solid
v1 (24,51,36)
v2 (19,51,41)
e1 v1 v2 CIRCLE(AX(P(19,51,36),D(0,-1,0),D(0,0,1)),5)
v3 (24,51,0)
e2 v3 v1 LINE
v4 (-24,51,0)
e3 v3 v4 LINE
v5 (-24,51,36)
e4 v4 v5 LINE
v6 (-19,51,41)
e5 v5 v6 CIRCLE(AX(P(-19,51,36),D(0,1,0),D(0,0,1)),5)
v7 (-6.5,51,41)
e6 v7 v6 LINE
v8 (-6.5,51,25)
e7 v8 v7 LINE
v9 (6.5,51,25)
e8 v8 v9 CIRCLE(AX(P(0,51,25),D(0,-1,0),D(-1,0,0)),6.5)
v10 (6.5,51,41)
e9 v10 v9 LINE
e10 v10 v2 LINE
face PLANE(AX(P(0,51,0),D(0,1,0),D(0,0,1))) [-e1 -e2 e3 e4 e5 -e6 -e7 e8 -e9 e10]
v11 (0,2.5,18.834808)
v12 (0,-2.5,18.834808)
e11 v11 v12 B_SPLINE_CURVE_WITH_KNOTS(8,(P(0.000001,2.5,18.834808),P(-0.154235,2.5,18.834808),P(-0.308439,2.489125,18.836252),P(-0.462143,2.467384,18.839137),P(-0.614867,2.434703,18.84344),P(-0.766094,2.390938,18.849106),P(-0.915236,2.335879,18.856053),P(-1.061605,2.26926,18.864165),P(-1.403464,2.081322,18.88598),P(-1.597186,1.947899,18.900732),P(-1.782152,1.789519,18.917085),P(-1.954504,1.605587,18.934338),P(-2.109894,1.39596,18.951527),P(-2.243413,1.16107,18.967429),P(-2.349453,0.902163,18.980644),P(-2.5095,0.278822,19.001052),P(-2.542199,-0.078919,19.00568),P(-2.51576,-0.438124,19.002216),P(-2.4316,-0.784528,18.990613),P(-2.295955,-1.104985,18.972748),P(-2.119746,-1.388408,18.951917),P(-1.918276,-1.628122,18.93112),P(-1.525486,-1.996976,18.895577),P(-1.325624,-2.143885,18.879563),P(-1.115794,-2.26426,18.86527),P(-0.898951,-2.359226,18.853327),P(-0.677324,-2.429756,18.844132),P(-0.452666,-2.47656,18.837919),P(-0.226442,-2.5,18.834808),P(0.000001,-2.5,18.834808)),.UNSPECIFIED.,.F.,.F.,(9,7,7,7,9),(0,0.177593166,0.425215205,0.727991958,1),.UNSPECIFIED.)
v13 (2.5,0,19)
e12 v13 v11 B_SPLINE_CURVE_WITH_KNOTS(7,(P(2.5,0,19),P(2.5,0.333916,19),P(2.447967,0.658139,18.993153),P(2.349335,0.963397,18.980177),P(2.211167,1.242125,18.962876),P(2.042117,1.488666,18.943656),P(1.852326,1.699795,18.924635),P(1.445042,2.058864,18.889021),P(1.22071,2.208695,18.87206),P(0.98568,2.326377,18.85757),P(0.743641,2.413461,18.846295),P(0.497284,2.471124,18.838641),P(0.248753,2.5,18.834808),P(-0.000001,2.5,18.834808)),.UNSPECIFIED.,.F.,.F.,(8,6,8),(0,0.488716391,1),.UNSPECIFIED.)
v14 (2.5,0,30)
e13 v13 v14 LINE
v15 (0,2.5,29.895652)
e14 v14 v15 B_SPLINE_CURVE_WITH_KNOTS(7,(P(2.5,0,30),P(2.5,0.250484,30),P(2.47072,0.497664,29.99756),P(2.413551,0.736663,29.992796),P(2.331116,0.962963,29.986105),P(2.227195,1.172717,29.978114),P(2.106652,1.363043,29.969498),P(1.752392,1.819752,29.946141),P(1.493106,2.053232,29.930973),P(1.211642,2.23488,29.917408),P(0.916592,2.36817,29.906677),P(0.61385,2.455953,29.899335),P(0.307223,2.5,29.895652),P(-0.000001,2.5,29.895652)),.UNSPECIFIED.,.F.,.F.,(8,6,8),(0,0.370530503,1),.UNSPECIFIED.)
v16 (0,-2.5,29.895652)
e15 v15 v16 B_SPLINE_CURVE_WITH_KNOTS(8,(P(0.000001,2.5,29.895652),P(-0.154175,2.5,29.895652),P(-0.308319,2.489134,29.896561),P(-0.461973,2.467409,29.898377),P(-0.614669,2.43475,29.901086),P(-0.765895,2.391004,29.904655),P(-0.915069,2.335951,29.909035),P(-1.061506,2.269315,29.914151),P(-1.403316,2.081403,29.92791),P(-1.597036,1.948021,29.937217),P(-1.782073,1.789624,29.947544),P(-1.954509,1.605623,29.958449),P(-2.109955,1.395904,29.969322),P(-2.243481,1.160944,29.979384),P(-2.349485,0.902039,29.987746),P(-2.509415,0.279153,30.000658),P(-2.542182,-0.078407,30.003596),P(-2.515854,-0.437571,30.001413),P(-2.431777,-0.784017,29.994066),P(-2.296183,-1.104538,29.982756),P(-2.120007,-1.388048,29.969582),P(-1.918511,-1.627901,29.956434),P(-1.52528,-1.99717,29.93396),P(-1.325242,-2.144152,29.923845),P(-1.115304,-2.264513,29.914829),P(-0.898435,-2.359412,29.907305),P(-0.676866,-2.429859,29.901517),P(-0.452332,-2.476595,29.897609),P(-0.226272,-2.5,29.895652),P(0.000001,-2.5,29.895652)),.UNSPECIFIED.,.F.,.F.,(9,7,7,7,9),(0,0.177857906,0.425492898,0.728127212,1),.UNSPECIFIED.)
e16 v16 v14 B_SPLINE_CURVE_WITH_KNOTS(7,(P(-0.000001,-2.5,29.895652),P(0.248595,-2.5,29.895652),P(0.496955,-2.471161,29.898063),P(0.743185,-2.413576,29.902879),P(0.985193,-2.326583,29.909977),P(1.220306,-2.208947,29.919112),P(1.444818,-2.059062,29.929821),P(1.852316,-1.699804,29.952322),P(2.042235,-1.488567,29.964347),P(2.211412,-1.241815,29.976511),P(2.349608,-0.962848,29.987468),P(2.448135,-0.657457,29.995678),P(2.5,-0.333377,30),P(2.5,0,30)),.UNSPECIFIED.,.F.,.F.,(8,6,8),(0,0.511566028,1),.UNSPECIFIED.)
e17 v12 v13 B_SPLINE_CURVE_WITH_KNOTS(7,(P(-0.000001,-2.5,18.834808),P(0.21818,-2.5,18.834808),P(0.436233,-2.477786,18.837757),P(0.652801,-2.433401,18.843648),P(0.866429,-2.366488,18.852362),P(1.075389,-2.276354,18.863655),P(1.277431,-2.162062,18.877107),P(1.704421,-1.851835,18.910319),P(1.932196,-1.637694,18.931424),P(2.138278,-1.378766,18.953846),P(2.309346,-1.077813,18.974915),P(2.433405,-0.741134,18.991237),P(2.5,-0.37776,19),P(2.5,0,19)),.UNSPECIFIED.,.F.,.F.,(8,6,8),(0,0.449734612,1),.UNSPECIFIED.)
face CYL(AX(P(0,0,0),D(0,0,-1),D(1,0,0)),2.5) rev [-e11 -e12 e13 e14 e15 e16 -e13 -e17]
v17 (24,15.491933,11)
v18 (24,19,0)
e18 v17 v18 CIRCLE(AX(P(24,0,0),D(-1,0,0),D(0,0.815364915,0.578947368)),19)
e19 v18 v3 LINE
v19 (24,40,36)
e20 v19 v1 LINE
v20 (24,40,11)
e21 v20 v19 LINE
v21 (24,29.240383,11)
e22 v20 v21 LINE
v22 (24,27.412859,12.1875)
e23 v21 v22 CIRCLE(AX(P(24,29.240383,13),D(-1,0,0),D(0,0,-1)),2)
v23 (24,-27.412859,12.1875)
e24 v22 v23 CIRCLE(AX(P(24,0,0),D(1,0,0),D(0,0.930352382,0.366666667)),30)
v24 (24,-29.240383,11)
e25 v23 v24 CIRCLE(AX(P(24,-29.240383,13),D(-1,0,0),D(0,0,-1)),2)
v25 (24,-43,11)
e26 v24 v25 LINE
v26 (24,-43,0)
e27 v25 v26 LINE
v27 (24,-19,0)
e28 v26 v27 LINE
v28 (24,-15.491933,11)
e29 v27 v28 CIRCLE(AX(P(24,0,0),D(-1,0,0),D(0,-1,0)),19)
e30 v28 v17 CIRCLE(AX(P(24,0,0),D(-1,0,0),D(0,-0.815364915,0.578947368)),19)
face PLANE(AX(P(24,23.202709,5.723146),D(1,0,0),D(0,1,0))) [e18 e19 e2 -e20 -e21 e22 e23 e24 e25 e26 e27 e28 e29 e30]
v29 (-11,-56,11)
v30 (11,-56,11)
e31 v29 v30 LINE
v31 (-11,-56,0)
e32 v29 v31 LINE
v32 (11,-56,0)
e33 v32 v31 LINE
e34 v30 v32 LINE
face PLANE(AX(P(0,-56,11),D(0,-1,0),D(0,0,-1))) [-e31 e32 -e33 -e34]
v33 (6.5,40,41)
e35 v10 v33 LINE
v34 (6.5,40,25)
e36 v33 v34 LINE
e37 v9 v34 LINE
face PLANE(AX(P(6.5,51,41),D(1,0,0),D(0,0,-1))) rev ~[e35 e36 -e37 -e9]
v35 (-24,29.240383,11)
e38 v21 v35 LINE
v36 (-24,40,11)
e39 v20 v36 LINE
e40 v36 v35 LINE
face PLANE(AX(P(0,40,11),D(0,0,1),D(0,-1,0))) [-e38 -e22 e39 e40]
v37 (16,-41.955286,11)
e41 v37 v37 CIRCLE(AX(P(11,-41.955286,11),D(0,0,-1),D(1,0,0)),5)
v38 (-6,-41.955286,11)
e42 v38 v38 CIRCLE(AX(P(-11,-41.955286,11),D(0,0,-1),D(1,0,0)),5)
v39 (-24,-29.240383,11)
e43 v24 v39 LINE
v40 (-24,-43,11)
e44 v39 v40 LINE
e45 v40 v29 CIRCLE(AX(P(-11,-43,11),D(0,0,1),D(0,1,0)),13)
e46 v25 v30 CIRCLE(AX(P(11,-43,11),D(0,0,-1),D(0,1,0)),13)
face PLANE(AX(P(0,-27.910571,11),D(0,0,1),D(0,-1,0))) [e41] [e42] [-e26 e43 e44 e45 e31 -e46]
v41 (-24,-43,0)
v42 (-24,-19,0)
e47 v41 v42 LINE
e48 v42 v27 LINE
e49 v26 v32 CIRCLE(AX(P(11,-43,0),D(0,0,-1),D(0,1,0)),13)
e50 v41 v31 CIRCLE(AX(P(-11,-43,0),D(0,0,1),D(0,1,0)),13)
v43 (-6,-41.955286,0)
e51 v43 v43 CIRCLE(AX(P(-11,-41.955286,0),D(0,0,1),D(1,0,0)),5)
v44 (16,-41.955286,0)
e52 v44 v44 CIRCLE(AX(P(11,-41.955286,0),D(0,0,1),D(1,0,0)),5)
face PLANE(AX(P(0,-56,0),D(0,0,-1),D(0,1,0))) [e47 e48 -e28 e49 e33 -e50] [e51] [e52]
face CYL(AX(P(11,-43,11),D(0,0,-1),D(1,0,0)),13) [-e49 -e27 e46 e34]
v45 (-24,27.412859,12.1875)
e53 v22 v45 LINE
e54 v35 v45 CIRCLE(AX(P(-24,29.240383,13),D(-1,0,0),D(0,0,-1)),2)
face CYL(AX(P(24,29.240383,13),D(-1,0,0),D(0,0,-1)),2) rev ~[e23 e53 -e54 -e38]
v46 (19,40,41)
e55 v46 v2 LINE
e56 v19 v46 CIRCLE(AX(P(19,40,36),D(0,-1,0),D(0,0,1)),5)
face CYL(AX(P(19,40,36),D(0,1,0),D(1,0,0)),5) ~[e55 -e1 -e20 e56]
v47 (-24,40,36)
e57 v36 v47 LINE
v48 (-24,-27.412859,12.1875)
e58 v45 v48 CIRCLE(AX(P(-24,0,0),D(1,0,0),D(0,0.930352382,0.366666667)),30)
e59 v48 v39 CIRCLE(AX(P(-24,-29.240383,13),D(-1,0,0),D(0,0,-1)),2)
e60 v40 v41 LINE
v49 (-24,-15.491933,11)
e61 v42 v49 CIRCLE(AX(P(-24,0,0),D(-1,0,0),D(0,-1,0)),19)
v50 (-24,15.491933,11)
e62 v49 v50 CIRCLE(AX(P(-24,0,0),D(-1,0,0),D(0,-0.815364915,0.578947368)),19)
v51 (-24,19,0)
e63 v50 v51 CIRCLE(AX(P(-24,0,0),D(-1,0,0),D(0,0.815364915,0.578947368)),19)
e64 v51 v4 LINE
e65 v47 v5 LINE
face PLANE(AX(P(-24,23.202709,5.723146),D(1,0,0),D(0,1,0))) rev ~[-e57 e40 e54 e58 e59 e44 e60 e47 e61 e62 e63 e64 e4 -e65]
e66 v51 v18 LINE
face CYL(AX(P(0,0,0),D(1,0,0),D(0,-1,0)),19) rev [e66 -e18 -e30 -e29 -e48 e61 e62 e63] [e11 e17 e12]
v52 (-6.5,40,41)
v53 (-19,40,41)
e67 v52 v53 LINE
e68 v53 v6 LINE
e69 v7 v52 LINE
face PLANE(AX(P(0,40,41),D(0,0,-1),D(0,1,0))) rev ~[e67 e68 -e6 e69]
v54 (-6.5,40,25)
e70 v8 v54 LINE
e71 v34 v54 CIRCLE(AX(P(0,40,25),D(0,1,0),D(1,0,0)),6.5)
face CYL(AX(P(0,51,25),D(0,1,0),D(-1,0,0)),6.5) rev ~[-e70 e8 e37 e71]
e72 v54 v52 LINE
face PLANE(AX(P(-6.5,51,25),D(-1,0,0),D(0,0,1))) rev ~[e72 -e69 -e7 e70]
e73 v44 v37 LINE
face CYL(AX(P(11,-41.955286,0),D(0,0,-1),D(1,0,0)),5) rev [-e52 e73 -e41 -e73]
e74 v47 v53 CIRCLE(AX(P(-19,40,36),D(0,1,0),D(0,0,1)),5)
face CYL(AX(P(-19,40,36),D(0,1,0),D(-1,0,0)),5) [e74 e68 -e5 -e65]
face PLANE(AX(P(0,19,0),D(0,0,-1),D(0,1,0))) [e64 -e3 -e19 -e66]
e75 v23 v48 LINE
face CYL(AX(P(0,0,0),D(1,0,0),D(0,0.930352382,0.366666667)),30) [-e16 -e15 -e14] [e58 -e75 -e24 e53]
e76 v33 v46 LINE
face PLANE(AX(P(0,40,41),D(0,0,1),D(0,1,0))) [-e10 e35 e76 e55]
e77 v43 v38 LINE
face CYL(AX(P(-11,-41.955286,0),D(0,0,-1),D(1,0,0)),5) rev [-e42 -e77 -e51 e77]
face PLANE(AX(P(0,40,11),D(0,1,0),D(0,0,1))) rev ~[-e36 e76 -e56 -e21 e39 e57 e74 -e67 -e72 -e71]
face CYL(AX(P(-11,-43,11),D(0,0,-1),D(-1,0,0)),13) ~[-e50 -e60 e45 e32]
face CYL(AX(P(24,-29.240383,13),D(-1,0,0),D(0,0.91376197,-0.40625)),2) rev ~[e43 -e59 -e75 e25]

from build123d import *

# Parameters (mm, degrees)
F0_W     = 11
F0_H     = 30
F1_DEPTH = 24
F3_DEPTH = 11
F4_R     = 2.5
F4_R_2   = 5
F5_DEPTH = 41.001
F6_R     = 13
F7_R     = 5
F8_R     = 2


with BuildPart() as f1:
    # F0 (on Right) → F1 (new body, symmetric)
    with BuildSketch(Plane.YZ):
        with BuildLine():
            ThreePointArc((15.4919333848, 11), (18.1017503893, 5.7729223833), (19, 0))
            Line((19, 0), (30, 0))
            ThreePointArc((30, 0), (29.4730143031, 5.5983415304), (27.9105714739, 11))
            Line((27.9105714739, 11), (15.4919333848, 11))
        make_face()
        with BuildLine():
            ThreePointArc((-15.4919333848, 11), (0, 19), (15.4919333848, 11))
            Line((15.4919333848, 11), (27.9105714739, 11))
            ThreePointArc((27.9105714739, 11), (0, 30), (-27.9105714739, 11))
            Line((-27.9105714739, 11), (-15.4919333848, 11))
        make_face()
        with BuildLine():
            Line((-30, 0), (-19, 0))
            ThreePointArc((-19, 0), (-18.1017503893, 5.7729223833), (-15.4919333848, 11))
            Line((-15.4919333848, 11), (-27.9105714739, 11))
            ThreePointArc((-27.9105714739, 11), (-29.4730143031, 5.5983415304), (-30, 0))
        make_face()
        with BuildLine():
            ThreePointArc((27.9105714739, 11), (29.4730143031, 5.5983415304), (30, 0))
            Line((30, 0), (51, 0))
            Line((51, 0), (51, 11))
            Line((51, 11), (40, 11))
            Line((40, 11), (27.9105714739, 11))
        make_face()
        with BuildLine():
            Line((-56, 0), (-30, 0))
            ThreePointArc((-30, 0), (-29.4730143031, 5.5983415304), (-27.9105714739, 11))
            Line((-27.9105714739, 11), (-56, 11))
            Line((-56, 11), (-56, 0))
        make_face()
        with Locations((45.5, 26)):
            Rectangle(F0_W, F0_H)
    extrude(amount=F1_DEPTH, both=True)

    # F2 (on face) → F3 (cut, through all)
    with BuildSketch(Plane(origin=(0, 51, 0), x_dir=(-1, 0, 0), z_dir=(0, 1, 0))):
        with BuildLine():
            ThreePointArc((-6.5, 25), (0, 18.5), (6.5, 25))
            ThreePointArc((6.5, 25), (0, 31.5), (-6.5, 25))
        make_face()
        with BuildLine():
            ThreePointArc((-6.5, 25), (0, 31.5), (6.5, 25))
            Line((6.5, 25), (6.5, 41))
            Line((6.5, 41), (-6.5, 41))
            Line((-6.5, 41), (-6.5, 25))
        make_face()
    extrude(amount=-F3_DEPTH, mode=Mode.SUBTRACT)

    # F4 (on Top) → F5 (cut, through all)
    with BuildSketch(Plane.XY):
        Circle(F4_R)
        with Locations((-11, -41.955285737)):
            Circle(F4_R_2)
        with Locations((11, -41.955285737)):
            Circle(F4_R_2)
    extrude(amount=F5_DEPTH, mode=Mode.SUBTRACT)

    # F6
    f6_edges = [f1.edges().sort_by_distance(p)[0] for p in [
        (24, -56, 5.5),
        (-24, -56, 5.5),
    ]]
    fillet(f6_edges, radius=F6_R)

    # F7
    f7_edges = [f1.edges().sort_by_distance(p)[0] for p in [
        (24, 45.5, 41),
        (-24, 45.5, 41),
    ]]
    fillet(f7_edges, radius=F7_R)

    # F8
    f8_edges = [f1.edges().sort_by_distance(p)[0] for p in [
        (0, -27.910571, 11),
        (0, 27.910571, 11),
    ]]
    fillet(f8_edges, radius=F8_R)


solid = f1.part
